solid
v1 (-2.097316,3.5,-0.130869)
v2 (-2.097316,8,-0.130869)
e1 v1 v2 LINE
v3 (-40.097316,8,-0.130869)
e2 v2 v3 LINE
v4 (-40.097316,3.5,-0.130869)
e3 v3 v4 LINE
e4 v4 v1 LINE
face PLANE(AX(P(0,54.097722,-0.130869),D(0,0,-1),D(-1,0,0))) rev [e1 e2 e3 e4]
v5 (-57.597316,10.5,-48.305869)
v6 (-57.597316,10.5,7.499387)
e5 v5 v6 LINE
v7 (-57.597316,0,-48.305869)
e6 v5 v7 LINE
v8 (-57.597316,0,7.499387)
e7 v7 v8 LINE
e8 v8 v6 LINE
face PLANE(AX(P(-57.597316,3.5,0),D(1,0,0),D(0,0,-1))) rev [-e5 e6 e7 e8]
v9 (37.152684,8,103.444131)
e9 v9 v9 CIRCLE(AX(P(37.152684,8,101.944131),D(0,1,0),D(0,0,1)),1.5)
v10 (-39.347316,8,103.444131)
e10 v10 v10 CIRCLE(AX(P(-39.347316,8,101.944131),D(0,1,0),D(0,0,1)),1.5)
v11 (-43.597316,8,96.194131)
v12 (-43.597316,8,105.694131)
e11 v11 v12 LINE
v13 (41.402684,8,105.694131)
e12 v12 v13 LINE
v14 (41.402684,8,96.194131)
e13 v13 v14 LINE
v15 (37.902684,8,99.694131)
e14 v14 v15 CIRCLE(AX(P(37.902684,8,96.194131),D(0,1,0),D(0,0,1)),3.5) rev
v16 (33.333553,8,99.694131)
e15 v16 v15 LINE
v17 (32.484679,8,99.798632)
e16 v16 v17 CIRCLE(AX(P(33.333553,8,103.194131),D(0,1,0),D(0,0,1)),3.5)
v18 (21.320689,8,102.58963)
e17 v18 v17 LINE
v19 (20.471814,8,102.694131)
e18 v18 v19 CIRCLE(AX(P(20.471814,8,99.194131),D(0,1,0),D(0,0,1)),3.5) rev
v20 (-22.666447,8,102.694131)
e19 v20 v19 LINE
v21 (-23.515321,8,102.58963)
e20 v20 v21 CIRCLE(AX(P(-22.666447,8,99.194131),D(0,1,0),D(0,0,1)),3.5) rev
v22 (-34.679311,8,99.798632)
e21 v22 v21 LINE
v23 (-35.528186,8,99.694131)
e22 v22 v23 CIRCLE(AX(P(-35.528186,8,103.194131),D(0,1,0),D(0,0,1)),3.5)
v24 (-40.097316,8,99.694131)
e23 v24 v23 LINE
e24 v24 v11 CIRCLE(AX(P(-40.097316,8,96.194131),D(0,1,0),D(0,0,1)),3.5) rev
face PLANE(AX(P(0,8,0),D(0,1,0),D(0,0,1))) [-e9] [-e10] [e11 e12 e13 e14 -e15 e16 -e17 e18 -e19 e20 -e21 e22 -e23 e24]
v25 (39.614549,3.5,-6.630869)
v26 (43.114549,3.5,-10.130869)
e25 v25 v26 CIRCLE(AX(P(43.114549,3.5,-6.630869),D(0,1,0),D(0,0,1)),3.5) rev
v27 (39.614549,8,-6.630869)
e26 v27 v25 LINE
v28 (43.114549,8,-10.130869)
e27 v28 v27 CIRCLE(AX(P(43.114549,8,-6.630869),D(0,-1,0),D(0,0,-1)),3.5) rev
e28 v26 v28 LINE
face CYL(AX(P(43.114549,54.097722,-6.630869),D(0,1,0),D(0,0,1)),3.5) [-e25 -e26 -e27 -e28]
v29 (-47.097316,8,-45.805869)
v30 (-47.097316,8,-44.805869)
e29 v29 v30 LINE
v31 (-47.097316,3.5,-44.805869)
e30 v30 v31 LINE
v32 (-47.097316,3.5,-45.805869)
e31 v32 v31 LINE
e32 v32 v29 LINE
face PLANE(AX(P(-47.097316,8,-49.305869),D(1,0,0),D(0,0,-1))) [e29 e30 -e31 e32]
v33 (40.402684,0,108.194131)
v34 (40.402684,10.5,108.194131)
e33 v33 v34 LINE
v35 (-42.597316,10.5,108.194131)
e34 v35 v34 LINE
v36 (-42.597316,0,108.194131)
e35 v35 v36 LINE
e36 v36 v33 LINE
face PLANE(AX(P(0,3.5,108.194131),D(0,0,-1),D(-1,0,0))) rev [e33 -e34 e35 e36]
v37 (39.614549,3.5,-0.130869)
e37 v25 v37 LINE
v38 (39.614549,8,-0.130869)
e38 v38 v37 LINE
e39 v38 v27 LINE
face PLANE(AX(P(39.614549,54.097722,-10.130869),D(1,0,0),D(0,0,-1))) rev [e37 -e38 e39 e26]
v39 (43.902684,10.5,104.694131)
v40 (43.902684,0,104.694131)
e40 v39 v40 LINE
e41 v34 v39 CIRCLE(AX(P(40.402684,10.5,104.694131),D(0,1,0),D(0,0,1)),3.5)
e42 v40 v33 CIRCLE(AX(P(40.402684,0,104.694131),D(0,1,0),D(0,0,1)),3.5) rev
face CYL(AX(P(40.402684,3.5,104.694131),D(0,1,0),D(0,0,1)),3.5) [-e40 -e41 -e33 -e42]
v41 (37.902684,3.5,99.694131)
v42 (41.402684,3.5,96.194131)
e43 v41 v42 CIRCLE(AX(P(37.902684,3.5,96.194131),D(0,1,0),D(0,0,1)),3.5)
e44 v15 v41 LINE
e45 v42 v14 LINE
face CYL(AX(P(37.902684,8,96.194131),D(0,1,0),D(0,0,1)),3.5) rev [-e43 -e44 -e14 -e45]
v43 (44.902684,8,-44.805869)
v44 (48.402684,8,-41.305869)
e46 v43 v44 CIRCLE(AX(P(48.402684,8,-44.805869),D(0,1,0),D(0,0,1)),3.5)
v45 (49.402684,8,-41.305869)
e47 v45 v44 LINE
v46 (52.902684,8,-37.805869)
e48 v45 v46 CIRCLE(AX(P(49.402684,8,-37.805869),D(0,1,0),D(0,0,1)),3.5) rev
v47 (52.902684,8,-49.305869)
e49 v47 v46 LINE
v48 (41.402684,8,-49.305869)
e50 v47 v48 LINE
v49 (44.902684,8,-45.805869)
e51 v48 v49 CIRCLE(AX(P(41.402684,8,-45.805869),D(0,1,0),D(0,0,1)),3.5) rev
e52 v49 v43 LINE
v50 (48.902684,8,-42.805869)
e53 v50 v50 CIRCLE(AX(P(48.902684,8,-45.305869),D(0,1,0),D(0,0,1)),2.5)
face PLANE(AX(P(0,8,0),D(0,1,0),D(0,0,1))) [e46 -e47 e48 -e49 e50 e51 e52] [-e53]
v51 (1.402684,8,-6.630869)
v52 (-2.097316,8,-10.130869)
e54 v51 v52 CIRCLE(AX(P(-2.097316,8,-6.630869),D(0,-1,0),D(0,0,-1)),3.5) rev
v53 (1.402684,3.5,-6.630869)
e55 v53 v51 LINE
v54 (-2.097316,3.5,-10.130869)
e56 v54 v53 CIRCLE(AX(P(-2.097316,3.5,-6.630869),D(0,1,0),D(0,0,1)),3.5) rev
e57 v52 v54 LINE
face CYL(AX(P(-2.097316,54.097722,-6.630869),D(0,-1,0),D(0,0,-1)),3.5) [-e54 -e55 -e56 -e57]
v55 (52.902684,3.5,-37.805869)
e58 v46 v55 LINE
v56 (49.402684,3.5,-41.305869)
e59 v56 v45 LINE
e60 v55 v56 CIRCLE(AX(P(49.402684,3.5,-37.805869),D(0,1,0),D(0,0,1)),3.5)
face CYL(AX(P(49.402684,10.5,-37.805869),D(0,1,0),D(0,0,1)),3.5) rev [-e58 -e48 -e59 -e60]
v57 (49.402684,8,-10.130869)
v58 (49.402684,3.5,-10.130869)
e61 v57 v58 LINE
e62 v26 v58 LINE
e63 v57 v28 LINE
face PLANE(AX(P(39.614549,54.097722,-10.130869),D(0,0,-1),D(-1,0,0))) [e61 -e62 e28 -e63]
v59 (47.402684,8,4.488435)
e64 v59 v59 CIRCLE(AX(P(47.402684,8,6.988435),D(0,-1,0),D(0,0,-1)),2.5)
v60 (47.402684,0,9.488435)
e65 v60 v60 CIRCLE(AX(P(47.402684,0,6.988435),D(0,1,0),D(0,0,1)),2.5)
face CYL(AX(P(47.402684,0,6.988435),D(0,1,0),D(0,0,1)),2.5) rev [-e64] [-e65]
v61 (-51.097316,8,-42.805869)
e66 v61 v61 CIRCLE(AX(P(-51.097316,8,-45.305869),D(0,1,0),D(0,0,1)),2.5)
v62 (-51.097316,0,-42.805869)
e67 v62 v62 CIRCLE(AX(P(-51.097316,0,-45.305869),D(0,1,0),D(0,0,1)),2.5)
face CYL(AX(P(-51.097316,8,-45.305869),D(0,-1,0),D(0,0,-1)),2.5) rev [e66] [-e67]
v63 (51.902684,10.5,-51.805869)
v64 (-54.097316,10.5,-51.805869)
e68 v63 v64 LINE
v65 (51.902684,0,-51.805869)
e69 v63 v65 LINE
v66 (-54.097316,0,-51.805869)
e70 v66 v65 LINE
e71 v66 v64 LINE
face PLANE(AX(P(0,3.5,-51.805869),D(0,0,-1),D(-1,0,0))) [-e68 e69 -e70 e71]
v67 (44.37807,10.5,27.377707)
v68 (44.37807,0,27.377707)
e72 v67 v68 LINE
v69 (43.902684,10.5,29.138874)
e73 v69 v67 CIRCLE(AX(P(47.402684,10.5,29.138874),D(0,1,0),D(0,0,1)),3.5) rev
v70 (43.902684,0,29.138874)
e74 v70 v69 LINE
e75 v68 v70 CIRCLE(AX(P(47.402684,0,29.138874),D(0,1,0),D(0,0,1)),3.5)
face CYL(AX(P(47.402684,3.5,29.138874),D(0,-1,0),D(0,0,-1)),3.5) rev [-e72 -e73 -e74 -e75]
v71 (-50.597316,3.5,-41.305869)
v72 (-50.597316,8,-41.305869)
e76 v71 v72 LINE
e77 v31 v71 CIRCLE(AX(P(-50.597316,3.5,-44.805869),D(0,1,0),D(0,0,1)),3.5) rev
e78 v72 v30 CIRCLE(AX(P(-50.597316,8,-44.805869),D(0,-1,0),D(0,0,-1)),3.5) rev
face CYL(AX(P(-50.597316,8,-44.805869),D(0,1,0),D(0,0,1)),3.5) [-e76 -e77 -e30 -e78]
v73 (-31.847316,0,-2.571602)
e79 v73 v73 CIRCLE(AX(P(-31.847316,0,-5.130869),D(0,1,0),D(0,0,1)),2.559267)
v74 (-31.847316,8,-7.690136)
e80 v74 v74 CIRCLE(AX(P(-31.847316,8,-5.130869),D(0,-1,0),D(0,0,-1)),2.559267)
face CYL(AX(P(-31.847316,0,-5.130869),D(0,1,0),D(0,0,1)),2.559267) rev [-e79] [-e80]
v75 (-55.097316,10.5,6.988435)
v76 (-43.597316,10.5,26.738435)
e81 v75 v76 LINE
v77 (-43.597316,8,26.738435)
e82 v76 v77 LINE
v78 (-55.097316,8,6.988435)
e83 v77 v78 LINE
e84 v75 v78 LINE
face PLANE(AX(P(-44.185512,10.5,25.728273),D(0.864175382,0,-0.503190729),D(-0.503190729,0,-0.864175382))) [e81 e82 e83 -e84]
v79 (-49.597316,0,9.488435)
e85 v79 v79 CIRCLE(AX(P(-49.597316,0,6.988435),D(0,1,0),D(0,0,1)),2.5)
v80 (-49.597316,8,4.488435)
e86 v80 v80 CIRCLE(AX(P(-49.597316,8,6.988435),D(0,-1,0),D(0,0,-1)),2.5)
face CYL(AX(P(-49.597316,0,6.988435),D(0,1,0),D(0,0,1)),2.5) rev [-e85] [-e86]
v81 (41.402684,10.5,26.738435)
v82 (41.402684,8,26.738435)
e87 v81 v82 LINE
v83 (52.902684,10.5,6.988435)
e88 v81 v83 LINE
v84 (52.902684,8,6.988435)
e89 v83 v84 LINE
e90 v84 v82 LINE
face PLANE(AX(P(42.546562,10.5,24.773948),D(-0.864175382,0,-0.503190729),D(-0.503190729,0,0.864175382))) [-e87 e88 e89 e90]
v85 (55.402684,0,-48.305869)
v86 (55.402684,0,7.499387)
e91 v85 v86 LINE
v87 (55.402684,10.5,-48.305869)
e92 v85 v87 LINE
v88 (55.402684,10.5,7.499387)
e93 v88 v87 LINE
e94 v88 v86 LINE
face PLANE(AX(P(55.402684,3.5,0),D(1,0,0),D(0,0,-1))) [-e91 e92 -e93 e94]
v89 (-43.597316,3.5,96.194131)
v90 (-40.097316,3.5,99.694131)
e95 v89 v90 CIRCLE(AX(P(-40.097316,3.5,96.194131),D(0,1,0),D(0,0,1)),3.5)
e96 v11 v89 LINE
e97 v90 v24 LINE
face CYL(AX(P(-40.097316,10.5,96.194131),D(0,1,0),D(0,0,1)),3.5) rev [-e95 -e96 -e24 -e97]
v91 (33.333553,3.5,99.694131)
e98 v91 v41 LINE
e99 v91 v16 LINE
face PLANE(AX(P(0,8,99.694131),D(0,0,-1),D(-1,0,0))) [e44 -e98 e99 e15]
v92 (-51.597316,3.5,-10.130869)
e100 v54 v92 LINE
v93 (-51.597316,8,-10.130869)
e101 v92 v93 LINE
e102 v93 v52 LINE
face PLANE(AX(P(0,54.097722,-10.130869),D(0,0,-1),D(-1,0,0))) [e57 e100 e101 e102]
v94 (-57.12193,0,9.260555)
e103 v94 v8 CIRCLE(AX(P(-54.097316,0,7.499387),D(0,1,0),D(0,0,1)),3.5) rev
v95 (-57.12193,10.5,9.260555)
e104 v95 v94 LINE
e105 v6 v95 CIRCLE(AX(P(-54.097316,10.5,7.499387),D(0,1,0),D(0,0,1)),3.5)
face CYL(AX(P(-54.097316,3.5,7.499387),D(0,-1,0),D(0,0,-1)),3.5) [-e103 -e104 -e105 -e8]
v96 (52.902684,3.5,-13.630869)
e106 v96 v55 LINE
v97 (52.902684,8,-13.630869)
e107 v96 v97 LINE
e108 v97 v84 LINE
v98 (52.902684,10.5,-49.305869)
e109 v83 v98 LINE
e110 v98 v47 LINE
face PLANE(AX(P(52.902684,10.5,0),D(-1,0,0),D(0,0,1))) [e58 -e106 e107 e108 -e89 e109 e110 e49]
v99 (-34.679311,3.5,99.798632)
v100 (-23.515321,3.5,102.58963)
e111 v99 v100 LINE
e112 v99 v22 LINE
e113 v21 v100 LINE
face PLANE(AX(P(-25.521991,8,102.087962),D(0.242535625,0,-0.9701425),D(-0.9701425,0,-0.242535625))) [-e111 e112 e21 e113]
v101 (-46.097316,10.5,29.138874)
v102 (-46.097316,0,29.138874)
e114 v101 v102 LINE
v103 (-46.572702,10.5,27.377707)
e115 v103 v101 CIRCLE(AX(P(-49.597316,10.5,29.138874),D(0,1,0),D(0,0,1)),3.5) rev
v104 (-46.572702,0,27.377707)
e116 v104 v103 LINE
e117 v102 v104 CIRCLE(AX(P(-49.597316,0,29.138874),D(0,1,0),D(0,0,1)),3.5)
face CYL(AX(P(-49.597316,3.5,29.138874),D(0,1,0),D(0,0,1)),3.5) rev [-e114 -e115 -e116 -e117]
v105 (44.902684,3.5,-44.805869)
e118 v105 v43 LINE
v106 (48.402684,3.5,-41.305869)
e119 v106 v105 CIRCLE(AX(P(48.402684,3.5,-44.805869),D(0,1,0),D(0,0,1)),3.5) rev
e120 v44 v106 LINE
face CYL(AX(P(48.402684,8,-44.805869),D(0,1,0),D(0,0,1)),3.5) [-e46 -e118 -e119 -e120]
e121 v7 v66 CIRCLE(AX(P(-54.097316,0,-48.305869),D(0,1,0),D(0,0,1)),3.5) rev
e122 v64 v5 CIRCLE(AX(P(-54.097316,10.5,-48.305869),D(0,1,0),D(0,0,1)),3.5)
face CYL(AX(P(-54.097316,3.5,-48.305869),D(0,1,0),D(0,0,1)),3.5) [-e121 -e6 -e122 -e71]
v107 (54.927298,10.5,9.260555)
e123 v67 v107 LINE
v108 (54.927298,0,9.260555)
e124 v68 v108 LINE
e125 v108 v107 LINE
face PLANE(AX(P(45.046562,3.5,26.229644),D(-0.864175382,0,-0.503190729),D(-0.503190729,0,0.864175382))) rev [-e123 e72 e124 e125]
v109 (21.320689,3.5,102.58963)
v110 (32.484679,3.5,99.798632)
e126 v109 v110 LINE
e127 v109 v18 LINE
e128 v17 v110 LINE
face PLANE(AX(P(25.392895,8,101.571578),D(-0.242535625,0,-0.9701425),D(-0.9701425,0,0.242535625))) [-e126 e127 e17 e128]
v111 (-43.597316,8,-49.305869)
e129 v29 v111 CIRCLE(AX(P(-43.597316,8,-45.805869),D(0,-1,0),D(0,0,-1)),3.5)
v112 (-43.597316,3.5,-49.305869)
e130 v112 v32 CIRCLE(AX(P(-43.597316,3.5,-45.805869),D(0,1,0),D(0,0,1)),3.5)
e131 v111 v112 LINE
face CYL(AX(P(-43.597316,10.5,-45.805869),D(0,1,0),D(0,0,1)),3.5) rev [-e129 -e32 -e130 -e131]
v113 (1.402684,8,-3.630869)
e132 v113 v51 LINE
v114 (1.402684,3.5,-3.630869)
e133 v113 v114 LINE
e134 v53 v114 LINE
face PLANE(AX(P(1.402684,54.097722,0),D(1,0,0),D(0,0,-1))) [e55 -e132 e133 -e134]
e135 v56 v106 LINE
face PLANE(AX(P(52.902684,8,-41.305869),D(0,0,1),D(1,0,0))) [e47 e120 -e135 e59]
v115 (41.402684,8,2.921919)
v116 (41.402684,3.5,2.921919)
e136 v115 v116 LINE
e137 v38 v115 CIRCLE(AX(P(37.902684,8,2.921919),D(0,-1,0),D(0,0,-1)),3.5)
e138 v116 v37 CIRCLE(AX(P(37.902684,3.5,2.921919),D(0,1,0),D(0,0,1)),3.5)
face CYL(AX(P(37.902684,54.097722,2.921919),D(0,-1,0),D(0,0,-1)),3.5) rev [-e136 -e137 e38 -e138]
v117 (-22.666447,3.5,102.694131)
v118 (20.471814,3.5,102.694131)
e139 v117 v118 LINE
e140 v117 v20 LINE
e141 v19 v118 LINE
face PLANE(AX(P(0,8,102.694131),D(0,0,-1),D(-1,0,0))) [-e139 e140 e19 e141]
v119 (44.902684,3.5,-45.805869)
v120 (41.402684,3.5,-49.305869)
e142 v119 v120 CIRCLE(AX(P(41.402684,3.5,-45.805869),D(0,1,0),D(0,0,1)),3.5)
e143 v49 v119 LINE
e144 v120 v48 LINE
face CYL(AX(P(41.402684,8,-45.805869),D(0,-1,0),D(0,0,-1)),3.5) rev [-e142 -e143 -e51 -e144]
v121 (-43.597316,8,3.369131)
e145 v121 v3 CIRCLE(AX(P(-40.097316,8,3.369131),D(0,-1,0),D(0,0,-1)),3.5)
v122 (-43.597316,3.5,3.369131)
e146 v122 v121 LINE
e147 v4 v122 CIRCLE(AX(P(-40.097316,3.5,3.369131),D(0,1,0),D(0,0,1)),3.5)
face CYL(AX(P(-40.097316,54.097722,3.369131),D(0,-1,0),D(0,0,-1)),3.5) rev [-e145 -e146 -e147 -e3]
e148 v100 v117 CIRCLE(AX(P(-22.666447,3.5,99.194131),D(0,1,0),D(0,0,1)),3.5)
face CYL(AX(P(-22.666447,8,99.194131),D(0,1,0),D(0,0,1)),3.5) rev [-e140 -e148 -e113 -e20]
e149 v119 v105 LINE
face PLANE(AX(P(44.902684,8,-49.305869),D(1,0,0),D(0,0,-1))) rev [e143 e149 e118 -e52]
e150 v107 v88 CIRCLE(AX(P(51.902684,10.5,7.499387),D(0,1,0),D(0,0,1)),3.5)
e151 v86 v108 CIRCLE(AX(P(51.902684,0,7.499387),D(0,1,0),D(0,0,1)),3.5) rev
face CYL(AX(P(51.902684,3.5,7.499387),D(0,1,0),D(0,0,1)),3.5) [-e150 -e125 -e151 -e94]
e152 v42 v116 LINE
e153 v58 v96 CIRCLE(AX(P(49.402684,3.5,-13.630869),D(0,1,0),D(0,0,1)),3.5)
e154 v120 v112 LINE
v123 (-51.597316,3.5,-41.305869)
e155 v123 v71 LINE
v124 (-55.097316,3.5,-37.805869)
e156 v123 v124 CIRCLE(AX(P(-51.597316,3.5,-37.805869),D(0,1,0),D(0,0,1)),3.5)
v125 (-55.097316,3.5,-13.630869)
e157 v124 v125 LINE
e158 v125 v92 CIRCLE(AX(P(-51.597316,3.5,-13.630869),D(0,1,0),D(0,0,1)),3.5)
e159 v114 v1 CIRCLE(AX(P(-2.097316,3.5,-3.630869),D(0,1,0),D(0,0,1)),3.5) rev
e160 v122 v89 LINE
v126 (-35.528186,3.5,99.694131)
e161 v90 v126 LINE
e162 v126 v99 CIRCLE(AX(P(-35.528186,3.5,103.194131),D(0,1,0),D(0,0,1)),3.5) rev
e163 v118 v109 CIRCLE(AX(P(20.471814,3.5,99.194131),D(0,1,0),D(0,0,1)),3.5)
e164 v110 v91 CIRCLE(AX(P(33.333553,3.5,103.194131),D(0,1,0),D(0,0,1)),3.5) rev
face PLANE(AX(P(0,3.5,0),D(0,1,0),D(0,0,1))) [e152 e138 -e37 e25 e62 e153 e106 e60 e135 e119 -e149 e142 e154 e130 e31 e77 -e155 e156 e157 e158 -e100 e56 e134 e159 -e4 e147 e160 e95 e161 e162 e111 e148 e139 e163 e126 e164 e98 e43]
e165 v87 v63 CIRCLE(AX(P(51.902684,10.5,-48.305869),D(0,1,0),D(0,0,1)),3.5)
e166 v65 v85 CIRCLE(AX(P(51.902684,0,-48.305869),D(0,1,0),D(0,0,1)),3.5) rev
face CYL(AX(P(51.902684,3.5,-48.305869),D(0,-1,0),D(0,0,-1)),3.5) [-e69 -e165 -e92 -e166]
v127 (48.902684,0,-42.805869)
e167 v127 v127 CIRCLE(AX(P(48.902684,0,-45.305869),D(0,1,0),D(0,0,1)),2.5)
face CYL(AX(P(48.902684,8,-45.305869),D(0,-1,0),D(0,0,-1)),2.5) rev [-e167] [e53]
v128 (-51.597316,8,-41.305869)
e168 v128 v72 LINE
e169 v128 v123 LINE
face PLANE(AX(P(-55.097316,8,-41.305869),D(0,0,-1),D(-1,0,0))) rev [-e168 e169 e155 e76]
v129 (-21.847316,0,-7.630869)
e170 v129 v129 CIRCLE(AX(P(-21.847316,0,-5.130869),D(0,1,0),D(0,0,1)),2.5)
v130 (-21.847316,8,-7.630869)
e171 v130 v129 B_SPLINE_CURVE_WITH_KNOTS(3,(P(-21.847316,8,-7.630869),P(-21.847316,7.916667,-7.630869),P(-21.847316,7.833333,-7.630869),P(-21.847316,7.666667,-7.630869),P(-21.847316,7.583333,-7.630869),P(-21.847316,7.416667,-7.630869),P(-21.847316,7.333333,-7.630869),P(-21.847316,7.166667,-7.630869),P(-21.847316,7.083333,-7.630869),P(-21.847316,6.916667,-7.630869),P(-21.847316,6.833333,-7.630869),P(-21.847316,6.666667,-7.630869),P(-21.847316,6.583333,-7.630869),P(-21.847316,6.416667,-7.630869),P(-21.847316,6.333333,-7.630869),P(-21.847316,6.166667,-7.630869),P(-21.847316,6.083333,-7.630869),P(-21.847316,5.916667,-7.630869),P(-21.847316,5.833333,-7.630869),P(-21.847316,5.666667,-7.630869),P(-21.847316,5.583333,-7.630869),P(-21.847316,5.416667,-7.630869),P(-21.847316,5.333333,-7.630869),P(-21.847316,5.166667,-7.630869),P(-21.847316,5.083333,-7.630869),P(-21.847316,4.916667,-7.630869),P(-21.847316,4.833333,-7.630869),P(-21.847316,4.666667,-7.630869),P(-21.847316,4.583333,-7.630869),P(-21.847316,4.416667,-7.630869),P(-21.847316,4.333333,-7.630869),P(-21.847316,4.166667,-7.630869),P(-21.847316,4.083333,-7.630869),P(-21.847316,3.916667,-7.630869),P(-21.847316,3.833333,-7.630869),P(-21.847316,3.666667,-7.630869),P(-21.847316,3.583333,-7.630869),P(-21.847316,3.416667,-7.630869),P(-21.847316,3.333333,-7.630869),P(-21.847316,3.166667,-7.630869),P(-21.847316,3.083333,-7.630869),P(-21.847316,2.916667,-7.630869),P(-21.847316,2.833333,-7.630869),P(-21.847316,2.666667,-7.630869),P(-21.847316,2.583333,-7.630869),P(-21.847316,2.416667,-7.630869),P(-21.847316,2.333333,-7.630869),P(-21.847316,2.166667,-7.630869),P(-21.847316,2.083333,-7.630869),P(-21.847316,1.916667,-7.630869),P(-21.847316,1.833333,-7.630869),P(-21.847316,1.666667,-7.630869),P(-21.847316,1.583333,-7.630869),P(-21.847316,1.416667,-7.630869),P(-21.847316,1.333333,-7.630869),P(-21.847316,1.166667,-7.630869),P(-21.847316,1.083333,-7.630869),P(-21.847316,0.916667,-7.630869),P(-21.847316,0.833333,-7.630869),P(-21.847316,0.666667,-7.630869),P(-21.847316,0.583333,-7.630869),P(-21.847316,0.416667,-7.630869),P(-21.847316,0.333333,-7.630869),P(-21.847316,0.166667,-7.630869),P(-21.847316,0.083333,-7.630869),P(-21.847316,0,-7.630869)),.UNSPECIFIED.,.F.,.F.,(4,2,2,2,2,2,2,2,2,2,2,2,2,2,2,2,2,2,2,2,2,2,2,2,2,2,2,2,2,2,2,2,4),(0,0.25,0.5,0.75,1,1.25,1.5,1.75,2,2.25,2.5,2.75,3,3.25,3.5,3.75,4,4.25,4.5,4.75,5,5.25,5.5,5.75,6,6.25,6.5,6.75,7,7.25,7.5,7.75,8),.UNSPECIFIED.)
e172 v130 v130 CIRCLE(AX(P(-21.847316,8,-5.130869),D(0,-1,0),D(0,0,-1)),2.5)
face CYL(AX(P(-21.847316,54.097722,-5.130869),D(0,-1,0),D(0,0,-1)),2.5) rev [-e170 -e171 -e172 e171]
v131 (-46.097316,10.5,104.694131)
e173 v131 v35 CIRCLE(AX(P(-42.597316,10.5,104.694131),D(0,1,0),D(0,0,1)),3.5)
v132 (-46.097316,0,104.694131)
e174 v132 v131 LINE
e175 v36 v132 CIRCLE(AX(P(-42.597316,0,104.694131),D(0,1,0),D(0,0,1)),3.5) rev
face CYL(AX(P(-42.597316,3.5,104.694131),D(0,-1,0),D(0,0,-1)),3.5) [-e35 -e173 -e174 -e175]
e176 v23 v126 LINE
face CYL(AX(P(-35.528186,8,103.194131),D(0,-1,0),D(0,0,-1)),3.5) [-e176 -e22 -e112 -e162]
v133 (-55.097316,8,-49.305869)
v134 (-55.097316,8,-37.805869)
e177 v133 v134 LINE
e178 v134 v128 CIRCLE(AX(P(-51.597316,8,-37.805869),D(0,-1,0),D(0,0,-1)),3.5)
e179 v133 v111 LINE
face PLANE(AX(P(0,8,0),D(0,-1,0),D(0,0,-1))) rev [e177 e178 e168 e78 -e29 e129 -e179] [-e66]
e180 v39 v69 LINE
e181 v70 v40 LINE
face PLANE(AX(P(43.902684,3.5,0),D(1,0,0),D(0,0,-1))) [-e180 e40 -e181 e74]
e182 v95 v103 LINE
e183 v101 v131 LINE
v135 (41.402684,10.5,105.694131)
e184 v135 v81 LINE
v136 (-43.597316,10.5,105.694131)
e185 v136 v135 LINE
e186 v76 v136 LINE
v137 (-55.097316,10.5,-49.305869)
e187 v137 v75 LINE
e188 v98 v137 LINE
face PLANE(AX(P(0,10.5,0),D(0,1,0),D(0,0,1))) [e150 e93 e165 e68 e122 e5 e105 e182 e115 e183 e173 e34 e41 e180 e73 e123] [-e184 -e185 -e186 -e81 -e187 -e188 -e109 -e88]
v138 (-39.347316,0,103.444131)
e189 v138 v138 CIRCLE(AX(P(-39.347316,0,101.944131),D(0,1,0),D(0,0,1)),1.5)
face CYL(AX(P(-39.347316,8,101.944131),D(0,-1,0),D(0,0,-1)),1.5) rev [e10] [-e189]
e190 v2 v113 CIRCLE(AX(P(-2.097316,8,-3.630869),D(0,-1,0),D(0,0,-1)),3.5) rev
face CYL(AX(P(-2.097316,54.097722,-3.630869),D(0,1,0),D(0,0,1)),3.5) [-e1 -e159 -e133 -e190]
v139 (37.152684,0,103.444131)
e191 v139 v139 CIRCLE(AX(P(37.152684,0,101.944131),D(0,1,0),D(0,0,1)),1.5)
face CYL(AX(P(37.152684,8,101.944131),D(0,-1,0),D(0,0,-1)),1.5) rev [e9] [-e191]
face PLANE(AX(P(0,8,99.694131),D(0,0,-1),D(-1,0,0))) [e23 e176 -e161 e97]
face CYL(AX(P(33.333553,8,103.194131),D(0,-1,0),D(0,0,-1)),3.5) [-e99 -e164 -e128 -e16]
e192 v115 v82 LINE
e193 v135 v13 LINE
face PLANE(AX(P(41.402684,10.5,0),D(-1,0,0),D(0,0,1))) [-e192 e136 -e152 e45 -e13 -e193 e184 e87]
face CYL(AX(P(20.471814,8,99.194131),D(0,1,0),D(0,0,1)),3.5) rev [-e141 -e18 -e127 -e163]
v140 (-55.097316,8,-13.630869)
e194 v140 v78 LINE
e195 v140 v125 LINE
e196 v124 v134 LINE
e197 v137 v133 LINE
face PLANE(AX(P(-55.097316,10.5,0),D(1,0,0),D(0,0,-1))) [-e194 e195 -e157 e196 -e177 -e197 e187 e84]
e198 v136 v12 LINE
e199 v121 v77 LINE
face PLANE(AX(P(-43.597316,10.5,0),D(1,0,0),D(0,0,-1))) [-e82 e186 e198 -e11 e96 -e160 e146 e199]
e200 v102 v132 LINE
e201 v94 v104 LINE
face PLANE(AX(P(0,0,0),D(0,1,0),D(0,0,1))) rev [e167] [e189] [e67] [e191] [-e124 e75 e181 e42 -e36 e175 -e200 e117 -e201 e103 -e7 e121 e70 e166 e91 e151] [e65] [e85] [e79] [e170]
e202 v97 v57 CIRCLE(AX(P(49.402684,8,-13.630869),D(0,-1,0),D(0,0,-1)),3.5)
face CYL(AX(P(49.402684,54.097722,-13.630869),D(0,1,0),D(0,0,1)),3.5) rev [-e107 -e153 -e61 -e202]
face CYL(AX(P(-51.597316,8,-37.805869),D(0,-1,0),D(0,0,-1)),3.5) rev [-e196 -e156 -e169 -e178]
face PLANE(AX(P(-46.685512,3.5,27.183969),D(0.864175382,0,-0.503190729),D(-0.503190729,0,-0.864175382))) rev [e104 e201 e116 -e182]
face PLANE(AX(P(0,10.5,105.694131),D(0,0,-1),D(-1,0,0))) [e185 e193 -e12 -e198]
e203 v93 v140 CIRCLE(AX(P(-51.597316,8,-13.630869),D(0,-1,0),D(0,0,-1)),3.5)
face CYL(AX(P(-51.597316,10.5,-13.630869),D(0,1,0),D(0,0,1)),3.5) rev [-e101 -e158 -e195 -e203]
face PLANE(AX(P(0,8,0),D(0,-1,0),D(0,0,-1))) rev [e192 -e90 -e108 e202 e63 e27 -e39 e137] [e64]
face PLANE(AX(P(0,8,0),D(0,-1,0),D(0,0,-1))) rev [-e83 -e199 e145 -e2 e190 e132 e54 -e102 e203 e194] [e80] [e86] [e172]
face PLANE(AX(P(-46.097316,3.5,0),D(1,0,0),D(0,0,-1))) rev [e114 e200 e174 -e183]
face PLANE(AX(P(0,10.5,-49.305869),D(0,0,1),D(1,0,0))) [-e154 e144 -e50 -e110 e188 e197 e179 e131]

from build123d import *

# Parameters (mm, degrees)
BOSS_EXTRUDE1_DEPTH     = 3.5
BOSS_EXTRUDE2_DEPTH     = 7
SKETCH3_R               = 1.5
SKETCH3_W               = 8
SKETCH3_H               = 8
SKETCH3_R_2             = 2.5
BOSS_EXTRUDE3_DEPTH     = 4.5
SKETCH4_R               = 2.5
BOSS_EXTRUDE4_DEPTH     = 4.5
CUT_EXTRUDE1_DEPTH      = 123.693401635
CUT_EXTRUDE1_DEPTH_BACK = 123.693401635
SKETCH5_R               = 2.5
SKETCH5_R_2             = 2.55926668
SKETCH5_R_3             = 1.5
FILLET1_R               = 3.5


with BuildPart() as part:
    # Sketch1 → Boss-Extrude1 (new body)
    with BuildSketch(Plane(origin=(0, 0, 0), x_dir=(1, 0, 0), z_dir=(0, 1, 0))):
        Polygon((-57.597316241, 51.805869074), (-57.597316241, -8.444130926), (-46.097316241, -28.194130926), (-46.097316241, -108.194130926), (43.902683759, -108.194130926), (43.902683759, -28.194130926), (55.402683759, -8.444130926), (55.402683759, 51.805869074), align=None)
    extrude(amount=BOSS_EXTRUDE1_DEPTH)

    # Sketch2 → Boss-Extrude2 (add)
    with BuildSketch(Plane(origin=(0, 3.5, 0), x_dir=(1, 0, 0), z_dir=(0, 1, 0))):
        Polygon((-46.097316241, -28.194130926), (-46.097316241, -108.194130926), (43.902683759, -108.194130926), (43.902683759, -28.194130926), (41.402683759, -28.194130926), (41.402683759, -105.694130926), (-43.597316241, -105.694130926), (-43.597316241, -28.194130926), align=None)
        Polygon((52.902683759, -6.988434723), (55.402683759, -8.444130926), (43.902683759, -28.194130926), (41.402683759, -26.738434723), align=None)
        Polygon((41.402683759, -28.194130926), (43.902683759, -28.194130926), (41.402683759, -26.738434723), align=None)
        Polygon((52.902683759, -6.988434723), (55.402683759, -8.444130926), (55.402683759, -6.988434723), align=None)
        Polygon((-57.597316241, 51.805869074), (-57.597316241, -6.988434723), (-55.097316241, -6.988434723), (-55.097316241, 49.305869074), (52.902683759, 49.305869074), (52.902683759, -6.988434723), (55.402683759, -6.988434723), (55.402683759, 51.805869074), align=None)
        Polygon((-43.597316241, -26.738434723), (-46.097316241, -28.194130926), (-43.597316241, -28.194130926), align=None)
        Polygon((-43.597316241, -26.738434723), (-46.097316241, -28.194130926), (-57.597316241, -8.444130926), (-55.097316241, -6.988434723), align=None)
        Polygon((-57.597316241, -6.988434723), (-57.597316241, -8.444130926), (-55.097316241, -6.988434723), align=None)
    extrude(amount=BOSS_EXTRUDE2_DEPTH)

    # Sketch3 → Boss-Extrude3 (add)
    # profile 1 of 3: a face of its own
    with BuildSketch(Plane(origin=(0, 3.5, 0), x_dir=(1, 0, 0), z_dir=(0, 1, 0))):
        Polygon((-43.597316241, -99.694130926), (-43.597316241, -105.694130926), (41.402683759, -105.694130926), (41.402683759, -99.694130926), (32.902683759, -99.694130926), (20.902683759, -102.694130926), (-23.097316241, -102.694130926), (-35.097316241, -99.694130926), align=None)
        with Locations(Location((-39.347316241, -101.944130926, 0), (0, 0, 270))):
            Circle(SKETCH3_R, mode=Mode.SUBTRACT)
        with Locations(Location((37.152683759, -101.944130926, 0), (0, 0, 270))):
            Circle(SKETCH3_R, mode=Mode.SUBTRACT)
    # profile 2 of 3: a face of its own
    with BuildSketch(Plane(origin=(0, 3.5, 0), x_dir=(1, 0, 0), z_dir=(0, 1, 0))):
        with Locations((-51.097316241, 45.305869074)):
            Rectangle(SKETCH3_W, SKETCH3_H)
        with Locations(Location((-51.097316241, 45.305869074, 0), (0, 0, 270))):
            Circle(SKETCH3_R_2, mode=Mode.SUBTRACT)
    # profile 3 of 3: a face of its own
    with BuildSketch(Plane(origin=(0, 3.5, 0), x_dir=(1, 0, 0), z_dir=(0, 1, 0))):
        with Locations((48.902683759, 45.305869074)):
            Rectangle(SKETCH3_W, SKETCH3_H)
        with Locations(Location((48.902683759, 45.305869074, 0), (0, 0, 270))):
            Circle(SKETCH3_R_2, mode=Mode.SUBTRACT)
    extrude(amount=BOSS_EXTRUDE3_DEPTH)

    # Sketch4 → Boss-Extrude4 (add)
    # profile 1 of 2: a face of its own
    with BuildSketch(Plane(origin=(0, 3.5, 0), x_dir=(1, 0, 0), z_dir=(0, 1, 0))):
        Polygon((1.402683759, 10.130869074), (-55.097316241, 10.130869074), (-55.097316241, -6.988434723), (-43.597316241, -26.738434723), (-43.597316241, 0.130869074), (1.402683759, 0.130869074), align=None)
        with Locations(Location((-31.847316241, 5.130869074, 0), (0, 0, 90))):
            Circle(SKETCH4_R, mode=Mode.SUBTRACT)
        with Locations(Location((-21.847316241, 5.130869074, 0), (0, 0, 90))):
            Circle(SKETCH4_R, mode=Mode.SUBTRACT)
    # profile 2 of 2: a face of its own
    with BuildSketch(Plane(origin=(0, 3.5, 0), x_dir=(1, 0, 0), z_dir=(0, 1, 0))):
        Polygon((39.6145491, 10.130869074), (39.6145491, 0.130869074), (41.402683759, 0.130869074), (41.402683759, -26.738434723), (52.902683759, -6.988434723), (52.902683759, 10.130869074), align=None)
    extrude(amount=BOSS_EXTRUDE4_DEPTH)

    # Sketch5 → Cut-Extrude1 (cut, two sides: drawn at the far end of the back side and taken through both)
    with BuildSketch(Plane(origin=(0, 5, 0), x_dir=(1, 0, 0), z_dir=(0, 1, 0)).offset(-CUT_EXTRUDE1_DEPTH_BACK)):
        with Locations(Location((-21.847316241, 5.130869074, 0), (0, 0, 90))):
            Circle(SKETCH5_R)
        with Locations(Location((-31.847316241, 5.130869074, 0), (0, 0, 270))):
            Circle(SKETCH5_R_2)
        with Locations(Location((-39.347316241, -101.944130926, 0), (0, 0, 270))):
            Circle(SKETCH5_R_3)
        with Locations(Location((37.152683759, -101.944130926, 0), (0, 0, 270))):
            Circle(SKETCH5_R_3)
        with Locations(Location((-51.097316241, 45.305869074, 0), (0, 0, 270))):
            Circle(SKETCH5_R)
        with Locations(Location((48.902683759, 45.305869074, 0), (0, 0, 270))):
            Circle(SKETCH5_R)
        with Locations(Location((-49.597316241, -6.988434723, 0), (0, 0, 270))):
            Circle(SKETCH5_R)
        with Locations(Location((47.402683759, -6.988434723, 0), (0, 0, 270))):
            Circle(SKETCH5_R)
    extrude(amount=CUT_EXTRUDE1_DEPTH + CUT_EXTRUDE1_DEPTH_BACK, mode=Mode.SUBTRACT)

    # Fillet1
    # the kernel refuses this fillet: 3.5 mm, written as the material it adds along each edge
    with BuildSketch(Plane(origin=(41.402683759, 3.5, 99.694130926), x_dir=(0, 0, -1), z_dir=(0, 1, 0)), Plane(origin=(-43.597316241, 3.5, 99.694130926), x_dir=(1, 0, 0), z_dir=(0, 1, 0)), Plane(origin=(-55.097316241, 3.5, -41.305869074), x_dir=(0, 0, 1), z_dir=(0, 1, 0)), Plane(origin=(-47.097316241, 3.5, -49.305869074), x_dir=(0, 0, 1), z_dir=(0, 1, 0)), Plane(origin=(52.902683759, 3.5, -41.305869074), x_dir=(-1, 0, 0), z_dir=(0, 1, 0)), Plane(origin=(-55.097316241, 3.5, -10.130869074), x_dir=(1, 0, 0), z_dir=(0, 1, 0))) as fillet1_piece_1:
        with BuildLine():
            CenterArc((FILLET1_R, FILLET1_R), FILLET1_R, 180, 90)
            Line((0, FILLET1_R), (0, 0))
            Line((0, 0), (FILLET1_R, 0))
        make_face()
    extrude(amount=4.5)
    with BuildSketch(Plane(origin=(20.902683759, 2.422825776, 102.694130926), x_dir=(0.9701425001453338, 0, -0.2425356250363252), z_dir=(0, 1, 0)), Plane(origin=(-23.097316241, 2.422825776, 102.694130926), x_dir=(1, 0, 0), z_dir=(0, 1, 0))) as fillet1_piece_2:
        with BuildLine():
            CenterArc((FILLET1_R * 0.123105625618, FILLET1_R), FILLET1_R, 255.963756532, 14.036243468)
            Line((-FILLET1_R * 0.119429999419, FILLET1_R * 0.0298574998547), (0, 0))
            Line((0, 0), (FILLET1_R * 0.123105625618, 0))
        make_face()
    extrude(amount=5.577174224)
    with BuildSketch(Plane(origin=(44.902683759, 3.5, -49.305869074), x_dir=(0, 0, 1), z_dir=(0, 1, 0)), Plane(origin=(52.902683759, 3.5, -10.130869074), x_dir=(-1, 0, 0), z_dir=(0, 1, 0)), Plane(origin=(-43.597316241, 3.5, -0.130869074), x_dir=(1, 0, 0), z_dir=(0, 1, 0))) as fillet1_piece_3:
        with BuildLine():
            CenterArc((FILLET1_R, -FILLET1_R), FILLET1_R, 90, 90)
            Line((0, -FILLET1_R), (0, 0))
            Line((0, 0), (FILLET1_R, 0))
        make_face()
    extrude(amount=4.5)
    with BuildSketch(Plane(origin=(43.902683759, 10.5, 28.194130926), x_dir=(0, 0, 1), z_dir=(0, -1, 0)), Plane(origin=(-46.097316241, 0, 28.194130926), x_dir=(0, 0, 1), z_dir=(0, 1, 0))) as fillet1_piece_4:
        with BuildLine():
            CenterArc((FILLET1_R * 0.269926710528, -FILLET1_R), FILLET1_R, 90, 30.211322386)
            Line((-FILLET1_R * 0.23326401814, -FILLET1_R * 0.135824618157), (0, 0))
            Line((0, 0), (FILLET1_R * 0.269926710528, 0))
        make_face()
    extrude(amount=10.5)
    with BuildSketch(Plane(origin=(41.402683759, 3.5, -0.130869074), x_dir=(-1, 0, 0), z_dir=(0, 1, 0))) as fillet1_piece_5:
        with BuildLine():
            CenterArc((3.5, 3.052788407), FILLET1_R, 180, 60.718267745)
            Line((0, 3.052788407), (0, 0))
            Line((0, 0), (1.788134659, 0))
        make_face()
    extrude(amount=4.5)
    # the kernel refuses this fillet: 3.5 mm, written as the material it takes off along each edge
    with BuildSketch(Plane(origin=(32.902683759, 3.5, 99.694130926), x_dir=(-0.9701425001453338, 0, 0.2425356250363252), z_dir=(0, 1, 0)), Plane(origin=(-35.097316241, 3.5, 99.694130926), x_dir=(-1, 0, 0), z_dir=(0, 1, 0))) as fillet1_2_piece_1:
        with BuildLine():
            CenterArc((FILLET1_R * 0.123105625618, FILLET1_R), FILLET1_R, 255.963756532, 14.036243468)
            Line((-FILLET1_R * 0.119429999419, FILLET1_R * 0.0298574998547), (0, 0))
            Line((0, 0), (FILLET1_R * 0.123105625618, 0))
        make_face()
    extrude(amount=5.577174224, mode=Mode.SUBTRACT)
    with BuildSketch(Plane(origin=(-47.097316241, 3.5, -41.305869074), x_dir=(0, 0, -1), z_dir=(0, 1, 0)), Plane(origin=(44.902683759, 3.5, -41.305869074), x_dir=(1, 0, 0), z_dir=(0, 1, 0)), Plane(origin=(39.6145491, 3.5, -10.130869074), x_dir=(0, 0, 1), z_dir=(0, 1, 0)), Plane(origin=(1.402683759, 3.5, -10.130869074), x_dir=(-1, 0, 0), z_dir=(0, 1, 0)), Plane(origin=(1.402683759, 3.5, -0.130869074), x_dir=(0, 0, -1), z_dir=(0, 1, 0))) as fillet1_2_piece_2:
        with BuildLine():
            CenterArc((FILLET1_R, FILLET1_R), FILLET1_R, 180, 90)
            Line((0, FILLET1_R), (0, 0))
            Line((0, 0), (FILLET1_R, 0))
        make_face()
    extrude(amount=13.25, mode=Mode.SUBTRACT)
    with BuildSketch(Plane(origin=(55.402683759, 12.861858717, 8.444130926), x_dir=(0, 0, -1), z_dir=(0, -1, 0))) as fillet1_2_piece_3:
        with BuildLine():
            CenterArc((FILLET1_R * 0.269926710528, -FILLET1_R), FILLET1_R, 90, 30.211322386)
            Line((-FILLET1_R * 0.23326401814, -FILLET1_R * 0.135824618157), (0, 0))
            Line((0, 0), (FILLET1_R * 0.269926710528, 0))
        make_face()
    extrude(amount=15.223717434, mode=Mode.SUBTRACT)
    with BuildSketch(Plane(origin=(43.902683759, 19.25, 108.194130926), x_dir=(0, 0, -1), z_dir=(0, -1, 0)), Plane(origin=(55.402683759, -8.75, -51.805869074), x_dir=(0, 0, 1), z_dir=(0, 1, 0))) as fillet1_2_piece_4:
        with BuildLine():
            CenterArc((FILLET1_R, -FILLET1_R), FILLET1_R, 90, 90)
            Line((0, -FILLET1_R), (0, 0))
            Line((0, 0), (FILLET1_R, 0))
        make_face()
    extrude(amount=28, mode=Mode.SUBTRACT)
    with BuildSketch(Plane(origin=(-46.097316241, -8.75, 108.194130926), x_dir=(1, 0, 0), z_dir=(0, 1, 0)), Plane(origin=(-57.597316241, -8.75, -51.805869074), x_dir=(0, 0, 1), z_dir=(0, 1, 0))) as fillet1_2_piece_5:
        with BuildLine():
            CenterArc((FILLET1_R, FILLET1_R), FILLET1_R, 180, 90)
            Line((0, FILLET1_R), (0, 0))
            Line((0, 0), (FILLET1_R, 0))
        make_face()
    extrude(amount=28, mode=Mode.SUBTRACT)
    with BuildSketch(Plane(origin=(-57.597316241, -2.361858717, 8.444130926), x_dir=(0.5031907286678244, 0, 0.8641753818425655), z_dir=(0, 1, 0))) as fillet1_2_piece_6:
        with BuildLine():
            CenterArc((FILLET1_R * 0.269926710528, FILLET1_R), FILLET1_R, 239.788677614, 30.211322386)
            Line((-FILLET1_R * 0.23326401814, FILLET1_R * 0.135824618157), (0, 0))
            Line((0, 0), (FILLET1_R * 0.269926710528, 0))
        make_face()
    extrude(amount=15.223717434, mode=Mode.SUBTRACT)


solid = part.part
